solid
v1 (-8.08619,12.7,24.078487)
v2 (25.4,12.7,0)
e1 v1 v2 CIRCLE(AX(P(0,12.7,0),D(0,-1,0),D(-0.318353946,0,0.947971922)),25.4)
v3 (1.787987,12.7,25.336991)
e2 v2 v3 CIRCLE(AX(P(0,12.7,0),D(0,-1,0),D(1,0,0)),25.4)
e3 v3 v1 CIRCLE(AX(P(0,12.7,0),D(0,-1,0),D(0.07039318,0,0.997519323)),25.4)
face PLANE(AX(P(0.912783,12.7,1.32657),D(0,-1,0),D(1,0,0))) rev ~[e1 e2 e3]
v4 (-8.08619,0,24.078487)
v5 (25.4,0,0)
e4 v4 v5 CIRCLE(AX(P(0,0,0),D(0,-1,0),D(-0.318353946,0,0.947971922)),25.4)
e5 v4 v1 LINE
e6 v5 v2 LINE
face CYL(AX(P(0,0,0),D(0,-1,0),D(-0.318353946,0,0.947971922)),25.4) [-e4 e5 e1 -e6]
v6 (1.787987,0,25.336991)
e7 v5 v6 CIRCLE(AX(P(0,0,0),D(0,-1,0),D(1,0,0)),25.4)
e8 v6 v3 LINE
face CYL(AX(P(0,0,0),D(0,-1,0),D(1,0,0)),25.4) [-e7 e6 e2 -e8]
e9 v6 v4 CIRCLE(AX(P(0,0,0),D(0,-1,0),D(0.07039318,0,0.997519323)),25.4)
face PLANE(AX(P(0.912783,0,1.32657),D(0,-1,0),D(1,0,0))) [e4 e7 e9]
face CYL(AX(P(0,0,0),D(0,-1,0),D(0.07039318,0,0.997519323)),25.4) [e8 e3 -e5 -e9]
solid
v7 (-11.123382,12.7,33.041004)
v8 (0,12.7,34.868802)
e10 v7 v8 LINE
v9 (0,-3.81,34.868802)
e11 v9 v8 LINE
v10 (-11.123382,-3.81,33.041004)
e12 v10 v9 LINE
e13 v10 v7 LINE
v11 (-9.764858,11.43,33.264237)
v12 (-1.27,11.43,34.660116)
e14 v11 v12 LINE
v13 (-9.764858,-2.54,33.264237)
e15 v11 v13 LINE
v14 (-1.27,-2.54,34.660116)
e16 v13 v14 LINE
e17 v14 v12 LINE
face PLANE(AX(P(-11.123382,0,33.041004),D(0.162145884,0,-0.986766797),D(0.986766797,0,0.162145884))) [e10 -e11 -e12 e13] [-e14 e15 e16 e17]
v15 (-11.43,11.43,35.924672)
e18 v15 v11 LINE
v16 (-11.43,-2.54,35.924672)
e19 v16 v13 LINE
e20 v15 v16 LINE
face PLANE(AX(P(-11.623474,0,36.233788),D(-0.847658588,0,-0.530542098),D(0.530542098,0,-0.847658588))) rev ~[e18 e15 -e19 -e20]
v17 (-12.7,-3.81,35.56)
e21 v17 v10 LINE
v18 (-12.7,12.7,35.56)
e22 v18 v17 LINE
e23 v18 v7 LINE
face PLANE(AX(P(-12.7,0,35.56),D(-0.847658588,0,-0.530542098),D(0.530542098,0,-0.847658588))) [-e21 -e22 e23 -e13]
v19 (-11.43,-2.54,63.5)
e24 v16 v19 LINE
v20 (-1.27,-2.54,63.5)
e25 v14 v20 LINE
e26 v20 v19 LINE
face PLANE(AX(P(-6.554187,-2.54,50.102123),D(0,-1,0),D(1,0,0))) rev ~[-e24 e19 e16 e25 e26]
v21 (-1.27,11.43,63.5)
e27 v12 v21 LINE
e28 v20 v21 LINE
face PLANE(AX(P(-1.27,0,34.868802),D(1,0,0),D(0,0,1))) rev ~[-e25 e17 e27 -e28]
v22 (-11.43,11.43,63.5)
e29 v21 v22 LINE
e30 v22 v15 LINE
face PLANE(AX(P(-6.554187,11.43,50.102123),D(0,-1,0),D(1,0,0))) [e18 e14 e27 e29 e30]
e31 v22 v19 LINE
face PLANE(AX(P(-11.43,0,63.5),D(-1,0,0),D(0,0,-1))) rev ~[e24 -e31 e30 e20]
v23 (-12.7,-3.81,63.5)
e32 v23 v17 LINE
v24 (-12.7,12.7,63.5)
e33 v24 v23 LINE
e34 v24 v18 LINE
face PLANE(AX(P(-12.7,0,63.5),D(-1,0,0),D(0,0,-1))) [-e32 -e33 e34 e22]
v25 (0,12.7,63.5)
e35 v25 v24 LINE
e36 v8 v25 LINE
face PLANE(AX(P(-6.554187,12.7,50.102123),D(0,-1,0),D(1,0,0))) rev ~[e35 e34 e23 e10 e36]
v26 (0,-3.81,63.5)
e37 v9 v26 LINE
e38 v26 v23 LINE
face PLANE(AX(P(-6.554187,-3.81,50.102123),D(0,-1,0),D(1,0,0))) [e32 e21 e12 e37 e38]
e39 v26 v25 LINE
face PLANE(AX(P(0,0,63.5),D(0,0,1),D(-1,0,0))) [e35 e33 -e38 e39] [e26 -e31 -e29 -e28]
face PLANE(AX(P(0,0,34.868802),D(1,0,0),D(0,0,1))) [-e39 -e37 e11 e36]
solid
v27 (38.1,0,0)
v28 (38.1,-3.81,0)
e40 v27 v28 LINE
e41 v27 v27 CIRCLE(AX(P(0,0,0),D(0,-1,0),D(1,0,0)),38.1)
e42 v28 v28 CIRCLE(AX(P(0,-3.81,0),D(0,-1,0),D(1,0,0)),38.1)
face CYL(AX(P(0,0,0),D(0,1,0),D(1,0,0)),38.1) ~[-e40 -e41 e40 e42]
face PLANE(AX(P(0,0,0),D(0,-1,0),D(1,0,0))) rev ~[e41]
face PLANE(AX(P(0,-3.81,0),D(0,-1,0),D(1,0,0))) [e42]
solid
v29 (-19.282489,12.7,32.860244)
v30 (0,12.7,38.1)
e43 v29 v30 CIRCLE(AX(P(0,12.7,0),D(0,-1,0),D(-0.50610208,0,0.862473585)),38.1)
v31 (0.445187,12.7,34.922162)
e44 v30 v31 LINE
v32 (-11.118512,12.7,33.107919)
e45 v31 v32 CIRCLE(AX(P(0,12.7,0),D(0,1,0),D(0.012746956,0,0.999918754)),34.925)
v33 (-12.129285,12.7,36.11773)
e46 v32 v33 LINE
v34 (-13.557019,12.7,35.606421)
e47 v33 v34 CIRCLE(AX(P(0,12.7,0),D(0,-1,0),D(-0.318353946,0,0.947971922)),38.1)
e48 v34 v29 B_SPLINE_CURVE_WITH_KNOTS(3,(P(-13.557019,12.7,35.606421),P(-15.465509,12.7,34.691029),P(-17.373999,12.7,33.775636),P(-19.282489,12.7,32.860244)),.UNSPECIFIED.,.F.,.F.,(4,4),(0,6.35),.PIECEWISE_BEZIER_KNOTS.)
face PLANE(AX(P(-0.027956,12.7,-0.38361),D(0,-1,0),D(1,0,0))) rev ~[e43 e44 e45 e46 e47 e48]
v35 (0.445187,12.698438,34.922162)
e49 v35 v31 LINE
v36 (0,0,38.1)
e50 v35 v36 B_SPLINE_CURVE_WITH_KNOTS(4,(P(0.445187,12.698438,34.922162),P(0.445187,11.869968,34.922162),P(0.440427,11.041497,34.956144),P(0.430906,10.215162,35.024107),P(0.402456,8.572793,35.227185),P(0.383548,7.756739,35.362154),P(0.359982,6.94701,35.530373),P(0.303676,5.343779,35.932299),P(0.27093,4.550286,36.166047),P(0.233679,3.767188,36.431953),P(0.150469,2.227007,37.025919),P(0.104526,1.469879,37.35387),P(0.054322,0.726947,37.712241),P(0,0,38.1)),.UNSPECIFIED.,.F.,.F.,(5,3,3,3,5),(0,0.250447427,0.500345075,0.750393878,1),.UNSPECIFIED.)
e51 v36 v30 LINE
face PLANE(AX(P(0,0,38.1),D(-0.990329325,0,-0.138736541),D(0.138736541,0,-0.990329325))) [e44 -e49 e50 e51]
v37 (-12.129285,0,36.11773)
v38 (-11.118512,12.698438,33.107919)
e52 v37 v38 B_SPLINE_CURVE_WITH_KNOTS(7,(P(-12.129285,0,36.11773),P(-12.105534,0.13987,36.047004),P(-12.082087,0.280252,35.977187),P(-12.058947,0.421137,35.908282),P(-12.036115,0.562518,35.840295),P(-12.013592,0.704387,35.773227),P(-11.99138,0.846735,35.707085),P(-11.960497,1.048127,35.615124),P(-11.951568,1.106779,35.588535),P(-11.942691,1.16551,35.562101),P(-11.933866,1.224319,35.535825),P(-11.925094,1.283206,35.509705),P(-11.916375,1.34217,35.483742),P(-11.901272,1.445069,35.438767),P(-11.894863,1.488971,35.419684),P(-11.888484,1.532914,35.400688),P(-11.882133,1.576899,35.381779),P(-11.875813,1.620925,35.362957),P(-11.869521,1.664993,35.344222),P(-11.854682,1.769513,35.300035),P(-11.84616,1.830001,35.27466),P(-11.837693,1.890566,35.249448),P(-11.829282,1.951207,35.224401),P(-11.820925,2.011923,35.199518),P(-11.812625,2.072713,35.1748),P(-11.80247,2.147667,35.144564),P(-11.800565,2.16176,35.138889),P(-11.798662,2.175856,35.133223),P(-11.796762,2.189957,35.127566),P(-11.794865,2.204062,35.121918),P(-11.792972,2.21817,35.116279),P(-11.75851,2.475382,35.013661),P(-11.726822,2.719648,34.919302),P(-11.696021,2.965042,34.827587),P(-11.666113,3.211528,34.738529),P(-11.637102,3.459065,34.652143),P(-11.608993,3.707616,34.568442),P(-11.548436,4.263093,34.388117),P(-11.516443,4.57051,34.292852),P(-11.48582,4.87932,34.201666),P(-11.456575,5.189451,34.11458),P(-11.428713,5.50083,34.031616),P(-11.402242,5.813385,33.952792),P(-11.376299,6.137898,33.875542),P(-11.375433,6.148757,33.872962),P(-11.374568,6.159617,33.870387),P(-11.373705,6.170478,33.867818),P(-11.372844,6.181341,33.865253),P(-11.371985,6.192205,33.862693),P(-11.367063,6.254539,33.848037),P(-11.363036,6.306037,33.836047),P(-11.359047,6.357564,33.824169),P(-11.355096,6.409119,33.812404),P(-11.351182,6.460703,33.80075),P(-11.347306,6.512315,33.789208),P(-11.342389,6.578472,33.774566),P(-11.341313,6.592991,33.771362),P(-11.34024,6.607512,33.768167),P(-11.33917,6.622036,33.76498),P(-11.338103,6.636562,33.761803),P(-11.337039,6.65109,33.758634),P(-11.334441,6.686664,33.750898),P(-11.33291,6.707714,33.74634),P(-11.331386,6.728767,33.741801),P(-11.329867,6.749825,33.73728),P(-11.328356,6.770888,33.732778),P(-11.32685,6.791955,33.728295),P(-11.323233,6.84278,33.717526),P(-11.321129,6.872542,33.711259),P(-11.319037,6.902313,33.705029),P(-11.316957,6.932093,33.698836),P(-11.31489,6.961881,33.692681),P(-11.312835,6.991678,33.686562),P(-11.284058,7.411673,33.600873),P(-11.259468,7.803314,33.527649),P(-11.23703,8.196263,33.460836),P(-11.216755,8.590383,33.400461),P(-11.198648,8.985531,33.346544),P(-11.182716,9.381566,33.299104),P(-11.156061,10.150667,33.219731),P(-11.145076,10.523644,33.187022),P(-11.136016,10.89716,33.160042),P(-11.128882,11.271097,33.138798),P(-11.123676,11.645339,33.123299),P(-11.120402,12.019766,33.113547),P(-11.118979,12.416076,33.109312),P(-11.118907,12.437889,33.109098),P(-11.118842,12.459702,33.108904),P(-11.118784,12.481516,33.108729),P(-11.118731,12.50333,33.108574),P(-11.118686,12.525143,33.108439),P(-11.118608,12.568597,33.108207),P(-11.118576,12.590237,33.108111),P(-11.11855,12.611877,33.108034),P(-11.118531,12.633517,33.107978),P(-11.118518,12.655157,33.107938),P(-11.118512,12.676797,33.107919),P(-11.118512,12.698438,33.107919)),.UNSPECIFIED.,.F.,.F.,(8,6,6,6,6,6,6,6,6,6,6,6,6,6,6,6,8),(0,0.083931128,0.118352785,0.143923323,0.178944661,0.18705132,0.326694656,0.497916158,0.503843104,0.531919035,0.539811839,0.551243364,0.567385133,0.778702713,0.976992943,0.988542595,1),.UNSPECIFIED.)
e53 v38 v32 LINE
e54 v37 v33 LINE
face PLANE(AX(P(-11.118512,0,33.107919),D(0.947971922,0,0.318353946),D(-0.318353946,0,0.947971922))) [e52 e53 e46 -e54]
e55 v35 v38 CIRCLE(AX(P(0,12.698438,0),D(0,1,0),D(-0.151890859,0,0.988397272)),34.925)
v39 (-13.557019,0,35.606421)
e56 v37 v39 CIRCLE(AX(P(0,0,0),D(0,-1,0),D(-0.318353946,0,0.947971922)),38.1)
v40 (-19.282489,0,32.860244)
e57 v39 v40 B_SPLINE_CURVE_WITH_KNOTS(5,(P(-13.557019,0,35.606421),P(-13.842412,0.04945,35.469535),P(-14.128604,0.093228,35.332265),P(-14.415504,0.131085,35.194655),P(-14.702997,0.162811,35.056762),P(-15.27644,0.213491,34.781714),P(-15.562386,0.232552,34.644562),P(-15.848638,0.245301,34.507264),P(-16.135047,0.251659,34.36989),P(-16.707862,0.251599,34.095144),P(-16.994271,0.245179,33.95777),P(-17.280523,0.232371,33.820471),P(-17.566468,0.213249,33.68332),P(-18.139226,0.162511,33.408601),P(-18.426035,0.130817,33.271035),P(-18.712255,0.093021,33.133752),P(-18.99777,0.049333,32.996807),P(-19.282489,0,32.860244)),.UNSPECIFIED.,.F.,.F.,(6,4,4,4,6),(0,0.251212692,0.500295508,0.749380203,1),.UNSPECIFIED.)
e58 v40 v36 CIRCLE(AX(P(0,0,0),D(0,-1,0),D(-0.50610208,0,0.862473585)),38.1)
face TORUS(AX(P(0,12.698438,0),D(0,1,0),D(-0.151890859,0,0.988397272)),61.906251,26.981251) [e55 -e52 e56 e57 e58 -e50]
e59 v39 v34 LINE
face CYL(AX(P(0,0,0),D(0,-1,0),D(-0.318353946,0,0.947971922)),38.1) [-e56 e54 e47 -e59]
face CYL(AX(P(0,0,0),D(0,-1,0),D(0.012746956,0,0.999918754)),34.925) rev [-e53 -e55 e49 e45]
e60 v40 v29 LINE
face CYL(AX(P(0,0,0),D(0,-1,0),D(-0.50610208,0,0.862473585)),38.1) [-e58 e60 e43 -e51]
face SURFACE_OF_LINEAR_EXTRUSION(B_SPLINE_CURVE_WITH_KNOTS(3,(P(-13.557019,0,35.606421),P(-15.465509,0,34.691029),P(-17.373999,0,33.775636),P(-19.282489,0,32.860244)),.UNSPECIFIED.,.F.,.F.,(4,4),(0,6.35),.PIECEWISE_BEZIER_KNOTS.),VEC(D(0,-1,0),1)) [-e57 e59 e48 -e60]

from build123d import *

# Parameters (mm, degrees)
F1_DEPTH      = 12.7
F2_R          = 38.1
F3_DEPTH      = 3.81
F4_T2_ANGLE   = 359.64
F6_DEPTH      = 3.81
F6_DEPTH_BACK = 12.7
F7_T          = -1.27


# Not quite as in the source:
# - a fillet or chamfer that OpenCascade refuses, or shapes differently, is made with other operations: its cross-section is extruded or revolved along the edge and cut away or added


with BuildPart() as f1:
    # F0 (on Front) → F1 (new body)
    with BuildSketch(Plane.XZ):
        with BuildLine():
            ThreePointArc((-8.0861902234, 24.0784868227), (-14.8285327717, -20.6221874649), (25.4, 0))
            ThreePointArc((25.4, 0), (18.5819114233, 17.3168290358), (1.787986783, 25.3369908092))
            ThreePointArc((1.787986783, 25.3369908092), (-3.2113548099, 25.1961743184), (-8.0861902234, 24.0784868227))
        make_face()
    extrude(amount=-F1_DEPTH)


with BuildPart() as f1b:
    # F0 (on Front) → F1, piece 2 (new body)
    with BuildSketch(Plane.XZ):
        with BuildLine():
            Line((0, 38.1), (0.4451874458, 34.9221624923))
            ThreePointArc((0.4451874458, 34.9221624923), (5.4132089756, -34.5029389123), (-11.1185115572, 33.1079193812))
            Line((-11.1185115572, 33.1079193812), (-12.1292853351, 36.1177302341))
            ThreePointArc((-12.1292853351, 36.1177302341), (-12.8456964833, 35.8691801113), (-13.5570191026, 35.6064212334))
            add(Edge.make_bspline(
                [(-13.5570191026, 35.6064212334), (-15.4655091495, 34.6910286845), (-17.3739991965, 33.7756361356), (-19.2824892434, 32.8602435867)],
                knots=[0, 0, 0, 0, 6.35, 6.35, 6.35, 6.35], degree=3))
            ThreePointArc((-19.2824892434, 32.8602435867), (9.9908638101, -36.7667327938), (0, 38.1))
        make_face()
    extrude(amount=-F1_DEPTH)

    # F4: fillet of radius 26.9812507731 on 1 edges, made by hand

    # F4_s1 → F4_t2 (revolve, cut)
    with BuildSketch(Plane(origin=(0, 0, 0), x_dir=(0, 1, 0), z_dir=(-0.9883972718, 0, -0.1518908593))):
        with BuildLine():
            ThreePointArc((12.6984375972, -34.925), (6.1537652905, -35.7307821492), (0, -38.1))
            Line((0, -38.1), (-0.2539687519, -37.6238749845))
            ThreePointArc((-0.2539687519, -37.6238749845), (-0.5396250155, -36.5125), (-0.5396250155, -34.925))
            Line((-0.5396250155, -34.925), (0, -34.3853749845))
            Line((0, -34.3853749845), (12.6984375972, -34.3853749845))
            Line((12.6984375972, -34.3853749845), (12.6984375972, -34.925))
        make_face()
    revolve(axis=Axis((0, 0, 0), (0, 1, 0)), revolution_arc=F4_T2_ANGLE, mode=Mode.SUBTRACT)


with BuildPart() as f3:
    # F2 (on Front) → F3 (new body)
    with BuildSketch(Plane.XZ):
        Circle(F2_R)
    extrude(amount=F3_DEPTH)


with BuildPart() as f6:
    # F5 (on Front) → F6 (new body, two sides)
    with BuildSketch(Plane.XZ) as f6_sk:
        Polygon((-12.7, 35.56), (0, 38.1), (0, 63.5), (-12.7, 63.5), align=None)
        Polygon((-11.1233824864, 33.0410040915), (0, 34.8688024059), (0, 38.1), (-12.7, 35.56), align=None)
    extrude(amount=F6_DEPTH)
    extrude(f6_sk.sketch, amount=-F6_DEPTH_BACK)

    # F7
    f7_openings = [f6.faces().sort_by_distance(p)[0] for p in [
        (-6.35, 4.445, 63.5),
        (-5.561691, 4.445, 33.954903),
    ]]
    offset(amount=F7_T, openings=f7_openings)


solid = Compound([f1.part, f1b.part, f3.part, f6.part])
